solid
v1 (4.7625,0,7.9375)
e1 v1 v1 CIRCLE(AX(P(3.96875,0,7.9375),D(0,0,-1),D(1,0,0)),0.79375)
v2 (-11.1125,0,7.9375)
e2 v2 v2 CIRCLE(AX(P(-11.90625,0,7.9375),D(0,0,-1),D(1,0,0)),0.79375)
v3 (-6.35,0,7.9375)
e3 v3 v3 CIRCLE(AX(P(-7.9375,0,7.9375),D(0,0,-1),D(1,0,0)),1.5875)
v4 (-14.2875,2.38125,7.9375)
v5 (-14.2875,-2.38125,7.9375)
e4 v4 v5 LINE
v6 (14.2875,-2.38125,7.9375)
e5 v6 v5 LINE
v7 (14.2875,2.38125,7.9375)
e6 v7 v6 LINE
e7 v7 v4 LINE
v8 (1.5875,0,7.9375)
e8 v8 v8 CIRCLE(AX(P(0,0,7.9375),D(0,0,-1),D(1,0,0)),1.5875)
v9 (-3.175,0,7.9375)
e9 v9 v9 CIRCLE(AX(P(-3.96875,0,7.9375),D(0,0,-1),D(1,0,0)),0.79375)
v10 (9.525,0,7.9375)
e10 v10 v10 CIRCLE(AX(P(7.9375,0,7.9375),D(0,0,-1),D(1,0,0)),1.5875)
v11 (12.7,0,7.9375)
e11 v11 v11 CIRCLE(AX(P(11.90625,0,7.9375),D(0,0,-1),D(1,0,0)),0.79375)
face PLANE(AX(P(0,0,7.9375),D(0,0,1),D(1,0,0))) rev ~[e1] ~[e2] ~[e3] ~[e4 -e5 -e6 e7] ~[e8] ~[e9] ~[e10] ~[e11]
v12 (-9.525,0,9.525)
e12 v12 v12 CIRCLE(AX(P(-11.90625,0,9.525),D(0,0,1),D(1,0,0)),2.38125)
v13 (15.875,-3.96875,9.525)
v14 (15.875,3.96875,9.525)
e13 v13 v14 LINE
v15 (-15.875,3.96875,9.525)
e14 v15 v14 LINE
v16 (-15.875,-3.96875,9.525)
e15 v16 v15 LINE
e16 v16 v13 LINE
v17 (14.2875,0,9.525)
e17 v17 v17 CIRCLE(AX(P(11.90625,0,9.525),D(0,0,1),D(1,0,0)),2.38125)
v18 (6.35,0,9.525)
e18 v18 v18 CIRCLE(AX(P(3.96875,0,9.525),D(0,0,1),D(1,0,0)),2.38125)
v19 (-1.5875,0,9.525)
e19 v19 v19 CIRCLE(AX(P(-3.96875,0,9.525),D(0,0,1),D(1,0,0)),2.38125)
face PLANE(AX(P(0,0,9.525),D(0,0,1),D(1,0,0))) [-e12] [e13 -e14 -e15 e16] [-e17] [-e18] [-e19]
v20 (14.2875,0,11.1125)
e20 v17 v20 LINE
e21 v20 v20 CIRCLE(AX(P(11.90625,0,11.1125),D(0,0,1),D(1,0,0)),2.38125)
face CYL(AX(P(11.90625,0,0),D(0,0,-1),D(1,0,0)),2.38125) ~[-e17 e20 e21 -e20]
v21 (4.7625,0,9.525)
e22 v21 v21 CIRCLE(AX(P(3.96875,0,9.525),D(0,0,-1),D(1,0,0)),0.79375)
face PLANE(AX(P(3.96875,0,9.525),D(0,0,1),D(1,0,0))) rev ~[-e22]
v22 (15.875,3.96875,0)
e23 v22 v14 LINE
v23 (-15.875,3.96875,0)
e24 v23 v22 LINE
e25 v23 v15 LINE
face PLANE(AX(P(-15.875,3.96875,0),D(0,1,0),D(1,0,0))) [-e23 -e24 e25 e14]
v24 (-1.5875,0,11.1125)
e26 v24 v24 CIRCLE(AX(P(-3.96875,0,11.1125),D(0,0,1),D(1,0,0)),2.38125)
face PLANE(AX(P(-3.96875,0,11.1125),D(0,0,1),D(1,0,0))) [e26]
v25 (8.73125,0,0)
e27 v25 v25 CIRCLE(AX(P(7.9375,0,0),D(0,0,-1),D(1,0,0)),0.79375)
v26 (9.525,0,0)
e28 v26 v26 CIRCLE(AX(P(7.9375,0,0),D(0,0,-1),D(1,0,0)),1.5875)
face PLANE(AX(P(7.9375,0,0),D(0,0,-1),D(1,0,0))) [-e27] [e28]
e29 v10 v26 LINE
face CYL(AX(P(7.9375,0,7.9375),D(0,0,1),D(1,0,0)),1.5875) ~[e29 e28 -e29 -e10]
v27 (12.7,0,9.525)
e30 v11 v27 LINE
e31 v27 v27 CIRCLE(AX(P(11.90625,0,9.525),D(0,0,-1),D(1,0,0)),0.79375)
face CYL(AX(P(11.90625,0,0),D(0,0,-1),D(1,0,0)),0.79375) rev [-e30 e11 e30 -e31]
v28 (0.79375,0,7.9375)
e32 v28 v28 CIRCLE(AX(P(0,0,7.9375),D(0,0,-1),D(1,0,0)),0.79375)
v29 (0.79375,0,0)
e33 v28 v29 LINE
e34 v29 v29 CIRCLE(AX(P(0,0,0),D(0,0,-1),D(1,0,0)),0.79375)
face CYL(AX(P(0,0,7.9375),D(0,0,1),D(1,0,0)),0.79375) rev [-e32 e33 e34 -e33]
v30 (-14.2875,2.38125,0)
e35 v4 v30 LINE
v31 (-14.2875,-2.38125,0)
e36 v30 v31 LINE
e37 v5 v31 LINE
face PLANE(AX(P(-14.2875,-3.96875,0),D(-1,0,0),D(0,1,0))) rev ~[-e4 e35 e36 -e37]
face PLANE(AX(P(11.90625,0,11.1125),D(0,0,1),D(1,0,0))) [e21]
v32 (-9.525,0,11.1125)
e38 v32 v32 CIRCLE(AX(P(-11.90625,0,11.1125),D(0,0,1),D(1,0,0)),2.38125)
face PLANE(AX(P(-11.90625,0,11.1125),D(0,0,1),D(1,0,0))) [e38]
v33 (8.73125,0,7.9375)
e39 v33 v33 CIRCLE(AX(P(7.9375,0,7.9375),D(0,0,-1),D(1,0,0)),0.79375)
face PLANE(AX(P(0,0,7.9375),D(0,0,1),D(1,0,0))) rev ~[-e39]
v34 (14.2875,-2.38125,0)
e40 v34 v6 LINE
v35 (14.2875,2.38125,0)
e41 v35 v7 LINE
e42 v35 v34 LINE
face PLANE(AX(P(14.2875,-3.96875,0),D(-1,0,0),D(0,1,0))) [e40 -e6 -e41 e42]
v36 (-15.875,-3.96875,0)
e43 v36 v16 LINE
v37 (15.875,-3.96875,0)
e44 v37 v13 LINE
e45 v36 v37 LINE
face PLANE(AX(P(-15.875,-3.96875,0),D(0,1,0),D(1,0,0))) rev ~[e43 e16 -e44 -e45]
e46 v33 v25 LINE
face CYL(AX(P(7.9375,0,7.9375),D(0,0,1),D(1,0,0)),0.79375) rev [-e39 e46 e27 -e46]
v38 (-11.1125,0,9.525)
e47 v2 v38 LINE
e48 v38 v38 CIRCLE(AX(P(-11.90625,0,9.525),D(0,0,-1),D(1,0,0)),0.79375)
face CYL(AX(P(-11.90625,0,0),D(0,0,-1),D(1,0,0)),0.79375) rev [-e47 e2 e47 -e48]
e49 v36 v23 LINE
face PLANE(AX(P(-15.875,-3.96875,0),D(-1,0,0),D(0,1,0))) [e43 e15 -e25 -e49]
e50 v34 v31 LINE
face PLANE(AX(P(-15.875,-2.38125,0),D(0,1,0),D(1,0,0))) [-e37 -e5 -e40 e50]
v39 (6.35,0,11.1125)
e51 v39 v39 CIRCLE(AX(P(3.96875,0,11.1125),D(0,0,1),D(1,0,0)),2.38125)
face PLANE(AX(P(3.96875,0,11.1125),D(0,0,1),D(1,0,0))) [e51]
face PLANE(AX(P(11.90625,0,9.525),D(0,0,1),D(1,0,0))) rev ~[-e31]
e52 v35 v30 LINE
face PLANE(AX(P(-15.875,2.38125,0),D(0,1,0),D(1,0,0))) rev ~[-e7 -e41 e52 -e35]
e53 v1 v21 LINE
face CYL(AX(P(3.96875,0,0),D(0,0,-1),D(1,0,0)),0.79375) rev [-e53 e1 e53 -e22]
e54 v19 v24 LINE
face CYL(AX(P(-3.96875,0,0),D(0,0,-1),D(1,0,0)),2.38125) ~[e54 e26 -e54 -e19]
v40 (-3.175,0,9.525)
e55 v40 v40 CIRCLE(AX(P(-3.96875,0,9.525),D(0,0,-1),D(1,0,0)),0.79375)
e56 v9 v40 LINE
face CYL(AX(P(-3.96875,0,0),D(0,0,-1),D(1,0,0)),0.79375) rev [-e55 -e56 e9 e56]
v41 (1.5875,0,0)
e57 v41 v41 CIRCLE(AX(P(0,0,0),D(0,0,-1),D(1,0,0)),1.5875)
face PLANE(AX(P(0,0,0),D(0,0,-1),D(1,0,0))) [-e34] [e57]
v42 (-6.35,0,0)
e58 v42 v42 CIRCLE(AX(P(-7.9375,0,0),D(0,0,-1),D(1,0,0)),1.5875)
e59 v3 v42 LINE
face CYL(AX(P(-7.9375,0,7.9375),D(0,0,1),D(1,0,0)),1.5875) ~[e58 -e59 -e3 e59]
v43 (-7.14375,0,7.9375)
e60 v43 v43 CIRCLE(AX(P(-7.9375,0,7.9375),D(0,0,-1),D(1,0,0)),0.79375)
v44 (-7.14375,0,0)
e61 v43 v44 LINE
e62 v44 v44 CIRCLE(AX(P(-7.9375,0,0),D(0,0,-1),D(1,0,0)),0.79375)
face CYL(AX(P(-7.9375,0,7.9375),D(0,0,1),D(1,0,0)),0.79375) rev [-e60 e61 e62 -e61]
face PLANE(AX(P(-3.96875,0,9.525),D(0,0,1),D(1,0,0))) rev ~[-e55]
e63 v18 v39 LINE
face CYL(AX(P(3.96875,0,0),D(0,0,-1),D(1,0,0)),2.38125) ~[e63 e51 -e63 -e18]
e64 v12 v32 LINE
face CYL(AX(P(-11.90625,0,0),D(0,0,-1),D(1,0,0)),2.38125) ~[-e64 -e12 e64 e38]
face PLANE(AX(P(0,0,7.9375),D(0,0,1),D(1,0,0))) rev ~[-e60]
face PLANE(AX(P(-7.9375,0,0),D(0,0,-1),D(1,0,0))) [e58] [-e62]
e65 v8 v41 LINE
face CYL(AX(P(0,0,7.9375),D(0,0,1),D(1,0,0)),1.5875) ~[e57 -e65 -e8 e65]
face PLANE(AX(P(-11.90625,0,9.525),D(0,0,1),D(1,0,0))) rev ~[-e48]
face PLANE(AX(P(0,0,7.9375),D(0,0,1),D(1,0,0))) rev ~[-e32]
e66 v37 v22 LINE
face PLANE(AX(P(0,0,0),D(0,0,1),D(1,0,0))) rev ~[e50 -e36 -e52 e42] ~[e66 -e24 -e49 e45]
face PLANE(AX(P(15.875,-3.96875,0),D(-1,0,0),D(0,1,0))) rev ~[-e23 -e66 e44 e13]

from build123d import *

# Parameters (mm, degrees)
F0_W     = 31.75
F0_H     = 7.9375
F0_R     = 2.38125
F1_DEPTH = 9.525
F2_DEPTH = 11.1125
F3_T     = -1.5875
F4_R     = 1.5875
F4_R_2   = 0.79375
F5_DEPTH = 7.9375


# Not quite as in the source:
# - a feature names something its author has since deleted; it is built from what else it names


with BuildPart() as f1:
    # F0 (on Top) → F1 (new body)
    with BuildSketch(Plane.XY):
        Rectangle(F0_W, F0_H)
        with Locations((-11.90625, 0)):
            Circle(F0_R, mode=Mode.SUBTRACT)
        with Locations((-3.96875, 0)):
            Circle(F0_R, mode=Mode.SUBTRACT)
        with Locations((3.96875, 0)):
            Circle(F0_R, mode=Mode.SUBTRACT)
        with Locations((11.90625, 0)):
            Circle(F0_R, mode=Mode.SUBTRACT)
    extrude(amount=F1_DEPTH)

    # F0 (on Top) → F2 (join)
    with BuildSketch(Plane.XY):
        with Locations((-11.90625, 0)):
            Circle(F0_R)
        with Locations((-3.96875, 0)):
            Circle(F0_R)
        with Locations((3.96875, 0)):
            Circle(F0_R)
        with Locations((11.90625, 0)):
            Circle(F0_R)
    extrude(amount=F2_DEPTH)

    # F3
    f3_openings = [f1.faces().sort_by_distance(p)[0] for p in [
        (0, 0, 0),
    ]]
    offset(amount=F3_T, openings=f3_openings, kind=Kind.INTERSECTION)

    # F4 (on face) → F5 (join)
    with BuildSketch(Plane(origin=(0, 0, 7.9375), x_dir=(1, 0, 0), z_dir=(0, 0, -1))):
        with Locations((-7.9375, 0)):
            Circle(F4_R)
        with Locations((-7.9375, 0)):
            Circle(F4_R_2, mode=Mode.SUBTRACT)
        Circle(F4_R)
        Circle(F4_R_2, mode=Mode.SUBTRACT)
        with Locations((7.9375, 0)):
            Circle(F4_R)
        with Locations((7.9375, 0)):
            Circle(F4_R_2, mode=Mode.SUBTRACT)
    extrude(amount=F5_DEPTH)


solid = f1.part
